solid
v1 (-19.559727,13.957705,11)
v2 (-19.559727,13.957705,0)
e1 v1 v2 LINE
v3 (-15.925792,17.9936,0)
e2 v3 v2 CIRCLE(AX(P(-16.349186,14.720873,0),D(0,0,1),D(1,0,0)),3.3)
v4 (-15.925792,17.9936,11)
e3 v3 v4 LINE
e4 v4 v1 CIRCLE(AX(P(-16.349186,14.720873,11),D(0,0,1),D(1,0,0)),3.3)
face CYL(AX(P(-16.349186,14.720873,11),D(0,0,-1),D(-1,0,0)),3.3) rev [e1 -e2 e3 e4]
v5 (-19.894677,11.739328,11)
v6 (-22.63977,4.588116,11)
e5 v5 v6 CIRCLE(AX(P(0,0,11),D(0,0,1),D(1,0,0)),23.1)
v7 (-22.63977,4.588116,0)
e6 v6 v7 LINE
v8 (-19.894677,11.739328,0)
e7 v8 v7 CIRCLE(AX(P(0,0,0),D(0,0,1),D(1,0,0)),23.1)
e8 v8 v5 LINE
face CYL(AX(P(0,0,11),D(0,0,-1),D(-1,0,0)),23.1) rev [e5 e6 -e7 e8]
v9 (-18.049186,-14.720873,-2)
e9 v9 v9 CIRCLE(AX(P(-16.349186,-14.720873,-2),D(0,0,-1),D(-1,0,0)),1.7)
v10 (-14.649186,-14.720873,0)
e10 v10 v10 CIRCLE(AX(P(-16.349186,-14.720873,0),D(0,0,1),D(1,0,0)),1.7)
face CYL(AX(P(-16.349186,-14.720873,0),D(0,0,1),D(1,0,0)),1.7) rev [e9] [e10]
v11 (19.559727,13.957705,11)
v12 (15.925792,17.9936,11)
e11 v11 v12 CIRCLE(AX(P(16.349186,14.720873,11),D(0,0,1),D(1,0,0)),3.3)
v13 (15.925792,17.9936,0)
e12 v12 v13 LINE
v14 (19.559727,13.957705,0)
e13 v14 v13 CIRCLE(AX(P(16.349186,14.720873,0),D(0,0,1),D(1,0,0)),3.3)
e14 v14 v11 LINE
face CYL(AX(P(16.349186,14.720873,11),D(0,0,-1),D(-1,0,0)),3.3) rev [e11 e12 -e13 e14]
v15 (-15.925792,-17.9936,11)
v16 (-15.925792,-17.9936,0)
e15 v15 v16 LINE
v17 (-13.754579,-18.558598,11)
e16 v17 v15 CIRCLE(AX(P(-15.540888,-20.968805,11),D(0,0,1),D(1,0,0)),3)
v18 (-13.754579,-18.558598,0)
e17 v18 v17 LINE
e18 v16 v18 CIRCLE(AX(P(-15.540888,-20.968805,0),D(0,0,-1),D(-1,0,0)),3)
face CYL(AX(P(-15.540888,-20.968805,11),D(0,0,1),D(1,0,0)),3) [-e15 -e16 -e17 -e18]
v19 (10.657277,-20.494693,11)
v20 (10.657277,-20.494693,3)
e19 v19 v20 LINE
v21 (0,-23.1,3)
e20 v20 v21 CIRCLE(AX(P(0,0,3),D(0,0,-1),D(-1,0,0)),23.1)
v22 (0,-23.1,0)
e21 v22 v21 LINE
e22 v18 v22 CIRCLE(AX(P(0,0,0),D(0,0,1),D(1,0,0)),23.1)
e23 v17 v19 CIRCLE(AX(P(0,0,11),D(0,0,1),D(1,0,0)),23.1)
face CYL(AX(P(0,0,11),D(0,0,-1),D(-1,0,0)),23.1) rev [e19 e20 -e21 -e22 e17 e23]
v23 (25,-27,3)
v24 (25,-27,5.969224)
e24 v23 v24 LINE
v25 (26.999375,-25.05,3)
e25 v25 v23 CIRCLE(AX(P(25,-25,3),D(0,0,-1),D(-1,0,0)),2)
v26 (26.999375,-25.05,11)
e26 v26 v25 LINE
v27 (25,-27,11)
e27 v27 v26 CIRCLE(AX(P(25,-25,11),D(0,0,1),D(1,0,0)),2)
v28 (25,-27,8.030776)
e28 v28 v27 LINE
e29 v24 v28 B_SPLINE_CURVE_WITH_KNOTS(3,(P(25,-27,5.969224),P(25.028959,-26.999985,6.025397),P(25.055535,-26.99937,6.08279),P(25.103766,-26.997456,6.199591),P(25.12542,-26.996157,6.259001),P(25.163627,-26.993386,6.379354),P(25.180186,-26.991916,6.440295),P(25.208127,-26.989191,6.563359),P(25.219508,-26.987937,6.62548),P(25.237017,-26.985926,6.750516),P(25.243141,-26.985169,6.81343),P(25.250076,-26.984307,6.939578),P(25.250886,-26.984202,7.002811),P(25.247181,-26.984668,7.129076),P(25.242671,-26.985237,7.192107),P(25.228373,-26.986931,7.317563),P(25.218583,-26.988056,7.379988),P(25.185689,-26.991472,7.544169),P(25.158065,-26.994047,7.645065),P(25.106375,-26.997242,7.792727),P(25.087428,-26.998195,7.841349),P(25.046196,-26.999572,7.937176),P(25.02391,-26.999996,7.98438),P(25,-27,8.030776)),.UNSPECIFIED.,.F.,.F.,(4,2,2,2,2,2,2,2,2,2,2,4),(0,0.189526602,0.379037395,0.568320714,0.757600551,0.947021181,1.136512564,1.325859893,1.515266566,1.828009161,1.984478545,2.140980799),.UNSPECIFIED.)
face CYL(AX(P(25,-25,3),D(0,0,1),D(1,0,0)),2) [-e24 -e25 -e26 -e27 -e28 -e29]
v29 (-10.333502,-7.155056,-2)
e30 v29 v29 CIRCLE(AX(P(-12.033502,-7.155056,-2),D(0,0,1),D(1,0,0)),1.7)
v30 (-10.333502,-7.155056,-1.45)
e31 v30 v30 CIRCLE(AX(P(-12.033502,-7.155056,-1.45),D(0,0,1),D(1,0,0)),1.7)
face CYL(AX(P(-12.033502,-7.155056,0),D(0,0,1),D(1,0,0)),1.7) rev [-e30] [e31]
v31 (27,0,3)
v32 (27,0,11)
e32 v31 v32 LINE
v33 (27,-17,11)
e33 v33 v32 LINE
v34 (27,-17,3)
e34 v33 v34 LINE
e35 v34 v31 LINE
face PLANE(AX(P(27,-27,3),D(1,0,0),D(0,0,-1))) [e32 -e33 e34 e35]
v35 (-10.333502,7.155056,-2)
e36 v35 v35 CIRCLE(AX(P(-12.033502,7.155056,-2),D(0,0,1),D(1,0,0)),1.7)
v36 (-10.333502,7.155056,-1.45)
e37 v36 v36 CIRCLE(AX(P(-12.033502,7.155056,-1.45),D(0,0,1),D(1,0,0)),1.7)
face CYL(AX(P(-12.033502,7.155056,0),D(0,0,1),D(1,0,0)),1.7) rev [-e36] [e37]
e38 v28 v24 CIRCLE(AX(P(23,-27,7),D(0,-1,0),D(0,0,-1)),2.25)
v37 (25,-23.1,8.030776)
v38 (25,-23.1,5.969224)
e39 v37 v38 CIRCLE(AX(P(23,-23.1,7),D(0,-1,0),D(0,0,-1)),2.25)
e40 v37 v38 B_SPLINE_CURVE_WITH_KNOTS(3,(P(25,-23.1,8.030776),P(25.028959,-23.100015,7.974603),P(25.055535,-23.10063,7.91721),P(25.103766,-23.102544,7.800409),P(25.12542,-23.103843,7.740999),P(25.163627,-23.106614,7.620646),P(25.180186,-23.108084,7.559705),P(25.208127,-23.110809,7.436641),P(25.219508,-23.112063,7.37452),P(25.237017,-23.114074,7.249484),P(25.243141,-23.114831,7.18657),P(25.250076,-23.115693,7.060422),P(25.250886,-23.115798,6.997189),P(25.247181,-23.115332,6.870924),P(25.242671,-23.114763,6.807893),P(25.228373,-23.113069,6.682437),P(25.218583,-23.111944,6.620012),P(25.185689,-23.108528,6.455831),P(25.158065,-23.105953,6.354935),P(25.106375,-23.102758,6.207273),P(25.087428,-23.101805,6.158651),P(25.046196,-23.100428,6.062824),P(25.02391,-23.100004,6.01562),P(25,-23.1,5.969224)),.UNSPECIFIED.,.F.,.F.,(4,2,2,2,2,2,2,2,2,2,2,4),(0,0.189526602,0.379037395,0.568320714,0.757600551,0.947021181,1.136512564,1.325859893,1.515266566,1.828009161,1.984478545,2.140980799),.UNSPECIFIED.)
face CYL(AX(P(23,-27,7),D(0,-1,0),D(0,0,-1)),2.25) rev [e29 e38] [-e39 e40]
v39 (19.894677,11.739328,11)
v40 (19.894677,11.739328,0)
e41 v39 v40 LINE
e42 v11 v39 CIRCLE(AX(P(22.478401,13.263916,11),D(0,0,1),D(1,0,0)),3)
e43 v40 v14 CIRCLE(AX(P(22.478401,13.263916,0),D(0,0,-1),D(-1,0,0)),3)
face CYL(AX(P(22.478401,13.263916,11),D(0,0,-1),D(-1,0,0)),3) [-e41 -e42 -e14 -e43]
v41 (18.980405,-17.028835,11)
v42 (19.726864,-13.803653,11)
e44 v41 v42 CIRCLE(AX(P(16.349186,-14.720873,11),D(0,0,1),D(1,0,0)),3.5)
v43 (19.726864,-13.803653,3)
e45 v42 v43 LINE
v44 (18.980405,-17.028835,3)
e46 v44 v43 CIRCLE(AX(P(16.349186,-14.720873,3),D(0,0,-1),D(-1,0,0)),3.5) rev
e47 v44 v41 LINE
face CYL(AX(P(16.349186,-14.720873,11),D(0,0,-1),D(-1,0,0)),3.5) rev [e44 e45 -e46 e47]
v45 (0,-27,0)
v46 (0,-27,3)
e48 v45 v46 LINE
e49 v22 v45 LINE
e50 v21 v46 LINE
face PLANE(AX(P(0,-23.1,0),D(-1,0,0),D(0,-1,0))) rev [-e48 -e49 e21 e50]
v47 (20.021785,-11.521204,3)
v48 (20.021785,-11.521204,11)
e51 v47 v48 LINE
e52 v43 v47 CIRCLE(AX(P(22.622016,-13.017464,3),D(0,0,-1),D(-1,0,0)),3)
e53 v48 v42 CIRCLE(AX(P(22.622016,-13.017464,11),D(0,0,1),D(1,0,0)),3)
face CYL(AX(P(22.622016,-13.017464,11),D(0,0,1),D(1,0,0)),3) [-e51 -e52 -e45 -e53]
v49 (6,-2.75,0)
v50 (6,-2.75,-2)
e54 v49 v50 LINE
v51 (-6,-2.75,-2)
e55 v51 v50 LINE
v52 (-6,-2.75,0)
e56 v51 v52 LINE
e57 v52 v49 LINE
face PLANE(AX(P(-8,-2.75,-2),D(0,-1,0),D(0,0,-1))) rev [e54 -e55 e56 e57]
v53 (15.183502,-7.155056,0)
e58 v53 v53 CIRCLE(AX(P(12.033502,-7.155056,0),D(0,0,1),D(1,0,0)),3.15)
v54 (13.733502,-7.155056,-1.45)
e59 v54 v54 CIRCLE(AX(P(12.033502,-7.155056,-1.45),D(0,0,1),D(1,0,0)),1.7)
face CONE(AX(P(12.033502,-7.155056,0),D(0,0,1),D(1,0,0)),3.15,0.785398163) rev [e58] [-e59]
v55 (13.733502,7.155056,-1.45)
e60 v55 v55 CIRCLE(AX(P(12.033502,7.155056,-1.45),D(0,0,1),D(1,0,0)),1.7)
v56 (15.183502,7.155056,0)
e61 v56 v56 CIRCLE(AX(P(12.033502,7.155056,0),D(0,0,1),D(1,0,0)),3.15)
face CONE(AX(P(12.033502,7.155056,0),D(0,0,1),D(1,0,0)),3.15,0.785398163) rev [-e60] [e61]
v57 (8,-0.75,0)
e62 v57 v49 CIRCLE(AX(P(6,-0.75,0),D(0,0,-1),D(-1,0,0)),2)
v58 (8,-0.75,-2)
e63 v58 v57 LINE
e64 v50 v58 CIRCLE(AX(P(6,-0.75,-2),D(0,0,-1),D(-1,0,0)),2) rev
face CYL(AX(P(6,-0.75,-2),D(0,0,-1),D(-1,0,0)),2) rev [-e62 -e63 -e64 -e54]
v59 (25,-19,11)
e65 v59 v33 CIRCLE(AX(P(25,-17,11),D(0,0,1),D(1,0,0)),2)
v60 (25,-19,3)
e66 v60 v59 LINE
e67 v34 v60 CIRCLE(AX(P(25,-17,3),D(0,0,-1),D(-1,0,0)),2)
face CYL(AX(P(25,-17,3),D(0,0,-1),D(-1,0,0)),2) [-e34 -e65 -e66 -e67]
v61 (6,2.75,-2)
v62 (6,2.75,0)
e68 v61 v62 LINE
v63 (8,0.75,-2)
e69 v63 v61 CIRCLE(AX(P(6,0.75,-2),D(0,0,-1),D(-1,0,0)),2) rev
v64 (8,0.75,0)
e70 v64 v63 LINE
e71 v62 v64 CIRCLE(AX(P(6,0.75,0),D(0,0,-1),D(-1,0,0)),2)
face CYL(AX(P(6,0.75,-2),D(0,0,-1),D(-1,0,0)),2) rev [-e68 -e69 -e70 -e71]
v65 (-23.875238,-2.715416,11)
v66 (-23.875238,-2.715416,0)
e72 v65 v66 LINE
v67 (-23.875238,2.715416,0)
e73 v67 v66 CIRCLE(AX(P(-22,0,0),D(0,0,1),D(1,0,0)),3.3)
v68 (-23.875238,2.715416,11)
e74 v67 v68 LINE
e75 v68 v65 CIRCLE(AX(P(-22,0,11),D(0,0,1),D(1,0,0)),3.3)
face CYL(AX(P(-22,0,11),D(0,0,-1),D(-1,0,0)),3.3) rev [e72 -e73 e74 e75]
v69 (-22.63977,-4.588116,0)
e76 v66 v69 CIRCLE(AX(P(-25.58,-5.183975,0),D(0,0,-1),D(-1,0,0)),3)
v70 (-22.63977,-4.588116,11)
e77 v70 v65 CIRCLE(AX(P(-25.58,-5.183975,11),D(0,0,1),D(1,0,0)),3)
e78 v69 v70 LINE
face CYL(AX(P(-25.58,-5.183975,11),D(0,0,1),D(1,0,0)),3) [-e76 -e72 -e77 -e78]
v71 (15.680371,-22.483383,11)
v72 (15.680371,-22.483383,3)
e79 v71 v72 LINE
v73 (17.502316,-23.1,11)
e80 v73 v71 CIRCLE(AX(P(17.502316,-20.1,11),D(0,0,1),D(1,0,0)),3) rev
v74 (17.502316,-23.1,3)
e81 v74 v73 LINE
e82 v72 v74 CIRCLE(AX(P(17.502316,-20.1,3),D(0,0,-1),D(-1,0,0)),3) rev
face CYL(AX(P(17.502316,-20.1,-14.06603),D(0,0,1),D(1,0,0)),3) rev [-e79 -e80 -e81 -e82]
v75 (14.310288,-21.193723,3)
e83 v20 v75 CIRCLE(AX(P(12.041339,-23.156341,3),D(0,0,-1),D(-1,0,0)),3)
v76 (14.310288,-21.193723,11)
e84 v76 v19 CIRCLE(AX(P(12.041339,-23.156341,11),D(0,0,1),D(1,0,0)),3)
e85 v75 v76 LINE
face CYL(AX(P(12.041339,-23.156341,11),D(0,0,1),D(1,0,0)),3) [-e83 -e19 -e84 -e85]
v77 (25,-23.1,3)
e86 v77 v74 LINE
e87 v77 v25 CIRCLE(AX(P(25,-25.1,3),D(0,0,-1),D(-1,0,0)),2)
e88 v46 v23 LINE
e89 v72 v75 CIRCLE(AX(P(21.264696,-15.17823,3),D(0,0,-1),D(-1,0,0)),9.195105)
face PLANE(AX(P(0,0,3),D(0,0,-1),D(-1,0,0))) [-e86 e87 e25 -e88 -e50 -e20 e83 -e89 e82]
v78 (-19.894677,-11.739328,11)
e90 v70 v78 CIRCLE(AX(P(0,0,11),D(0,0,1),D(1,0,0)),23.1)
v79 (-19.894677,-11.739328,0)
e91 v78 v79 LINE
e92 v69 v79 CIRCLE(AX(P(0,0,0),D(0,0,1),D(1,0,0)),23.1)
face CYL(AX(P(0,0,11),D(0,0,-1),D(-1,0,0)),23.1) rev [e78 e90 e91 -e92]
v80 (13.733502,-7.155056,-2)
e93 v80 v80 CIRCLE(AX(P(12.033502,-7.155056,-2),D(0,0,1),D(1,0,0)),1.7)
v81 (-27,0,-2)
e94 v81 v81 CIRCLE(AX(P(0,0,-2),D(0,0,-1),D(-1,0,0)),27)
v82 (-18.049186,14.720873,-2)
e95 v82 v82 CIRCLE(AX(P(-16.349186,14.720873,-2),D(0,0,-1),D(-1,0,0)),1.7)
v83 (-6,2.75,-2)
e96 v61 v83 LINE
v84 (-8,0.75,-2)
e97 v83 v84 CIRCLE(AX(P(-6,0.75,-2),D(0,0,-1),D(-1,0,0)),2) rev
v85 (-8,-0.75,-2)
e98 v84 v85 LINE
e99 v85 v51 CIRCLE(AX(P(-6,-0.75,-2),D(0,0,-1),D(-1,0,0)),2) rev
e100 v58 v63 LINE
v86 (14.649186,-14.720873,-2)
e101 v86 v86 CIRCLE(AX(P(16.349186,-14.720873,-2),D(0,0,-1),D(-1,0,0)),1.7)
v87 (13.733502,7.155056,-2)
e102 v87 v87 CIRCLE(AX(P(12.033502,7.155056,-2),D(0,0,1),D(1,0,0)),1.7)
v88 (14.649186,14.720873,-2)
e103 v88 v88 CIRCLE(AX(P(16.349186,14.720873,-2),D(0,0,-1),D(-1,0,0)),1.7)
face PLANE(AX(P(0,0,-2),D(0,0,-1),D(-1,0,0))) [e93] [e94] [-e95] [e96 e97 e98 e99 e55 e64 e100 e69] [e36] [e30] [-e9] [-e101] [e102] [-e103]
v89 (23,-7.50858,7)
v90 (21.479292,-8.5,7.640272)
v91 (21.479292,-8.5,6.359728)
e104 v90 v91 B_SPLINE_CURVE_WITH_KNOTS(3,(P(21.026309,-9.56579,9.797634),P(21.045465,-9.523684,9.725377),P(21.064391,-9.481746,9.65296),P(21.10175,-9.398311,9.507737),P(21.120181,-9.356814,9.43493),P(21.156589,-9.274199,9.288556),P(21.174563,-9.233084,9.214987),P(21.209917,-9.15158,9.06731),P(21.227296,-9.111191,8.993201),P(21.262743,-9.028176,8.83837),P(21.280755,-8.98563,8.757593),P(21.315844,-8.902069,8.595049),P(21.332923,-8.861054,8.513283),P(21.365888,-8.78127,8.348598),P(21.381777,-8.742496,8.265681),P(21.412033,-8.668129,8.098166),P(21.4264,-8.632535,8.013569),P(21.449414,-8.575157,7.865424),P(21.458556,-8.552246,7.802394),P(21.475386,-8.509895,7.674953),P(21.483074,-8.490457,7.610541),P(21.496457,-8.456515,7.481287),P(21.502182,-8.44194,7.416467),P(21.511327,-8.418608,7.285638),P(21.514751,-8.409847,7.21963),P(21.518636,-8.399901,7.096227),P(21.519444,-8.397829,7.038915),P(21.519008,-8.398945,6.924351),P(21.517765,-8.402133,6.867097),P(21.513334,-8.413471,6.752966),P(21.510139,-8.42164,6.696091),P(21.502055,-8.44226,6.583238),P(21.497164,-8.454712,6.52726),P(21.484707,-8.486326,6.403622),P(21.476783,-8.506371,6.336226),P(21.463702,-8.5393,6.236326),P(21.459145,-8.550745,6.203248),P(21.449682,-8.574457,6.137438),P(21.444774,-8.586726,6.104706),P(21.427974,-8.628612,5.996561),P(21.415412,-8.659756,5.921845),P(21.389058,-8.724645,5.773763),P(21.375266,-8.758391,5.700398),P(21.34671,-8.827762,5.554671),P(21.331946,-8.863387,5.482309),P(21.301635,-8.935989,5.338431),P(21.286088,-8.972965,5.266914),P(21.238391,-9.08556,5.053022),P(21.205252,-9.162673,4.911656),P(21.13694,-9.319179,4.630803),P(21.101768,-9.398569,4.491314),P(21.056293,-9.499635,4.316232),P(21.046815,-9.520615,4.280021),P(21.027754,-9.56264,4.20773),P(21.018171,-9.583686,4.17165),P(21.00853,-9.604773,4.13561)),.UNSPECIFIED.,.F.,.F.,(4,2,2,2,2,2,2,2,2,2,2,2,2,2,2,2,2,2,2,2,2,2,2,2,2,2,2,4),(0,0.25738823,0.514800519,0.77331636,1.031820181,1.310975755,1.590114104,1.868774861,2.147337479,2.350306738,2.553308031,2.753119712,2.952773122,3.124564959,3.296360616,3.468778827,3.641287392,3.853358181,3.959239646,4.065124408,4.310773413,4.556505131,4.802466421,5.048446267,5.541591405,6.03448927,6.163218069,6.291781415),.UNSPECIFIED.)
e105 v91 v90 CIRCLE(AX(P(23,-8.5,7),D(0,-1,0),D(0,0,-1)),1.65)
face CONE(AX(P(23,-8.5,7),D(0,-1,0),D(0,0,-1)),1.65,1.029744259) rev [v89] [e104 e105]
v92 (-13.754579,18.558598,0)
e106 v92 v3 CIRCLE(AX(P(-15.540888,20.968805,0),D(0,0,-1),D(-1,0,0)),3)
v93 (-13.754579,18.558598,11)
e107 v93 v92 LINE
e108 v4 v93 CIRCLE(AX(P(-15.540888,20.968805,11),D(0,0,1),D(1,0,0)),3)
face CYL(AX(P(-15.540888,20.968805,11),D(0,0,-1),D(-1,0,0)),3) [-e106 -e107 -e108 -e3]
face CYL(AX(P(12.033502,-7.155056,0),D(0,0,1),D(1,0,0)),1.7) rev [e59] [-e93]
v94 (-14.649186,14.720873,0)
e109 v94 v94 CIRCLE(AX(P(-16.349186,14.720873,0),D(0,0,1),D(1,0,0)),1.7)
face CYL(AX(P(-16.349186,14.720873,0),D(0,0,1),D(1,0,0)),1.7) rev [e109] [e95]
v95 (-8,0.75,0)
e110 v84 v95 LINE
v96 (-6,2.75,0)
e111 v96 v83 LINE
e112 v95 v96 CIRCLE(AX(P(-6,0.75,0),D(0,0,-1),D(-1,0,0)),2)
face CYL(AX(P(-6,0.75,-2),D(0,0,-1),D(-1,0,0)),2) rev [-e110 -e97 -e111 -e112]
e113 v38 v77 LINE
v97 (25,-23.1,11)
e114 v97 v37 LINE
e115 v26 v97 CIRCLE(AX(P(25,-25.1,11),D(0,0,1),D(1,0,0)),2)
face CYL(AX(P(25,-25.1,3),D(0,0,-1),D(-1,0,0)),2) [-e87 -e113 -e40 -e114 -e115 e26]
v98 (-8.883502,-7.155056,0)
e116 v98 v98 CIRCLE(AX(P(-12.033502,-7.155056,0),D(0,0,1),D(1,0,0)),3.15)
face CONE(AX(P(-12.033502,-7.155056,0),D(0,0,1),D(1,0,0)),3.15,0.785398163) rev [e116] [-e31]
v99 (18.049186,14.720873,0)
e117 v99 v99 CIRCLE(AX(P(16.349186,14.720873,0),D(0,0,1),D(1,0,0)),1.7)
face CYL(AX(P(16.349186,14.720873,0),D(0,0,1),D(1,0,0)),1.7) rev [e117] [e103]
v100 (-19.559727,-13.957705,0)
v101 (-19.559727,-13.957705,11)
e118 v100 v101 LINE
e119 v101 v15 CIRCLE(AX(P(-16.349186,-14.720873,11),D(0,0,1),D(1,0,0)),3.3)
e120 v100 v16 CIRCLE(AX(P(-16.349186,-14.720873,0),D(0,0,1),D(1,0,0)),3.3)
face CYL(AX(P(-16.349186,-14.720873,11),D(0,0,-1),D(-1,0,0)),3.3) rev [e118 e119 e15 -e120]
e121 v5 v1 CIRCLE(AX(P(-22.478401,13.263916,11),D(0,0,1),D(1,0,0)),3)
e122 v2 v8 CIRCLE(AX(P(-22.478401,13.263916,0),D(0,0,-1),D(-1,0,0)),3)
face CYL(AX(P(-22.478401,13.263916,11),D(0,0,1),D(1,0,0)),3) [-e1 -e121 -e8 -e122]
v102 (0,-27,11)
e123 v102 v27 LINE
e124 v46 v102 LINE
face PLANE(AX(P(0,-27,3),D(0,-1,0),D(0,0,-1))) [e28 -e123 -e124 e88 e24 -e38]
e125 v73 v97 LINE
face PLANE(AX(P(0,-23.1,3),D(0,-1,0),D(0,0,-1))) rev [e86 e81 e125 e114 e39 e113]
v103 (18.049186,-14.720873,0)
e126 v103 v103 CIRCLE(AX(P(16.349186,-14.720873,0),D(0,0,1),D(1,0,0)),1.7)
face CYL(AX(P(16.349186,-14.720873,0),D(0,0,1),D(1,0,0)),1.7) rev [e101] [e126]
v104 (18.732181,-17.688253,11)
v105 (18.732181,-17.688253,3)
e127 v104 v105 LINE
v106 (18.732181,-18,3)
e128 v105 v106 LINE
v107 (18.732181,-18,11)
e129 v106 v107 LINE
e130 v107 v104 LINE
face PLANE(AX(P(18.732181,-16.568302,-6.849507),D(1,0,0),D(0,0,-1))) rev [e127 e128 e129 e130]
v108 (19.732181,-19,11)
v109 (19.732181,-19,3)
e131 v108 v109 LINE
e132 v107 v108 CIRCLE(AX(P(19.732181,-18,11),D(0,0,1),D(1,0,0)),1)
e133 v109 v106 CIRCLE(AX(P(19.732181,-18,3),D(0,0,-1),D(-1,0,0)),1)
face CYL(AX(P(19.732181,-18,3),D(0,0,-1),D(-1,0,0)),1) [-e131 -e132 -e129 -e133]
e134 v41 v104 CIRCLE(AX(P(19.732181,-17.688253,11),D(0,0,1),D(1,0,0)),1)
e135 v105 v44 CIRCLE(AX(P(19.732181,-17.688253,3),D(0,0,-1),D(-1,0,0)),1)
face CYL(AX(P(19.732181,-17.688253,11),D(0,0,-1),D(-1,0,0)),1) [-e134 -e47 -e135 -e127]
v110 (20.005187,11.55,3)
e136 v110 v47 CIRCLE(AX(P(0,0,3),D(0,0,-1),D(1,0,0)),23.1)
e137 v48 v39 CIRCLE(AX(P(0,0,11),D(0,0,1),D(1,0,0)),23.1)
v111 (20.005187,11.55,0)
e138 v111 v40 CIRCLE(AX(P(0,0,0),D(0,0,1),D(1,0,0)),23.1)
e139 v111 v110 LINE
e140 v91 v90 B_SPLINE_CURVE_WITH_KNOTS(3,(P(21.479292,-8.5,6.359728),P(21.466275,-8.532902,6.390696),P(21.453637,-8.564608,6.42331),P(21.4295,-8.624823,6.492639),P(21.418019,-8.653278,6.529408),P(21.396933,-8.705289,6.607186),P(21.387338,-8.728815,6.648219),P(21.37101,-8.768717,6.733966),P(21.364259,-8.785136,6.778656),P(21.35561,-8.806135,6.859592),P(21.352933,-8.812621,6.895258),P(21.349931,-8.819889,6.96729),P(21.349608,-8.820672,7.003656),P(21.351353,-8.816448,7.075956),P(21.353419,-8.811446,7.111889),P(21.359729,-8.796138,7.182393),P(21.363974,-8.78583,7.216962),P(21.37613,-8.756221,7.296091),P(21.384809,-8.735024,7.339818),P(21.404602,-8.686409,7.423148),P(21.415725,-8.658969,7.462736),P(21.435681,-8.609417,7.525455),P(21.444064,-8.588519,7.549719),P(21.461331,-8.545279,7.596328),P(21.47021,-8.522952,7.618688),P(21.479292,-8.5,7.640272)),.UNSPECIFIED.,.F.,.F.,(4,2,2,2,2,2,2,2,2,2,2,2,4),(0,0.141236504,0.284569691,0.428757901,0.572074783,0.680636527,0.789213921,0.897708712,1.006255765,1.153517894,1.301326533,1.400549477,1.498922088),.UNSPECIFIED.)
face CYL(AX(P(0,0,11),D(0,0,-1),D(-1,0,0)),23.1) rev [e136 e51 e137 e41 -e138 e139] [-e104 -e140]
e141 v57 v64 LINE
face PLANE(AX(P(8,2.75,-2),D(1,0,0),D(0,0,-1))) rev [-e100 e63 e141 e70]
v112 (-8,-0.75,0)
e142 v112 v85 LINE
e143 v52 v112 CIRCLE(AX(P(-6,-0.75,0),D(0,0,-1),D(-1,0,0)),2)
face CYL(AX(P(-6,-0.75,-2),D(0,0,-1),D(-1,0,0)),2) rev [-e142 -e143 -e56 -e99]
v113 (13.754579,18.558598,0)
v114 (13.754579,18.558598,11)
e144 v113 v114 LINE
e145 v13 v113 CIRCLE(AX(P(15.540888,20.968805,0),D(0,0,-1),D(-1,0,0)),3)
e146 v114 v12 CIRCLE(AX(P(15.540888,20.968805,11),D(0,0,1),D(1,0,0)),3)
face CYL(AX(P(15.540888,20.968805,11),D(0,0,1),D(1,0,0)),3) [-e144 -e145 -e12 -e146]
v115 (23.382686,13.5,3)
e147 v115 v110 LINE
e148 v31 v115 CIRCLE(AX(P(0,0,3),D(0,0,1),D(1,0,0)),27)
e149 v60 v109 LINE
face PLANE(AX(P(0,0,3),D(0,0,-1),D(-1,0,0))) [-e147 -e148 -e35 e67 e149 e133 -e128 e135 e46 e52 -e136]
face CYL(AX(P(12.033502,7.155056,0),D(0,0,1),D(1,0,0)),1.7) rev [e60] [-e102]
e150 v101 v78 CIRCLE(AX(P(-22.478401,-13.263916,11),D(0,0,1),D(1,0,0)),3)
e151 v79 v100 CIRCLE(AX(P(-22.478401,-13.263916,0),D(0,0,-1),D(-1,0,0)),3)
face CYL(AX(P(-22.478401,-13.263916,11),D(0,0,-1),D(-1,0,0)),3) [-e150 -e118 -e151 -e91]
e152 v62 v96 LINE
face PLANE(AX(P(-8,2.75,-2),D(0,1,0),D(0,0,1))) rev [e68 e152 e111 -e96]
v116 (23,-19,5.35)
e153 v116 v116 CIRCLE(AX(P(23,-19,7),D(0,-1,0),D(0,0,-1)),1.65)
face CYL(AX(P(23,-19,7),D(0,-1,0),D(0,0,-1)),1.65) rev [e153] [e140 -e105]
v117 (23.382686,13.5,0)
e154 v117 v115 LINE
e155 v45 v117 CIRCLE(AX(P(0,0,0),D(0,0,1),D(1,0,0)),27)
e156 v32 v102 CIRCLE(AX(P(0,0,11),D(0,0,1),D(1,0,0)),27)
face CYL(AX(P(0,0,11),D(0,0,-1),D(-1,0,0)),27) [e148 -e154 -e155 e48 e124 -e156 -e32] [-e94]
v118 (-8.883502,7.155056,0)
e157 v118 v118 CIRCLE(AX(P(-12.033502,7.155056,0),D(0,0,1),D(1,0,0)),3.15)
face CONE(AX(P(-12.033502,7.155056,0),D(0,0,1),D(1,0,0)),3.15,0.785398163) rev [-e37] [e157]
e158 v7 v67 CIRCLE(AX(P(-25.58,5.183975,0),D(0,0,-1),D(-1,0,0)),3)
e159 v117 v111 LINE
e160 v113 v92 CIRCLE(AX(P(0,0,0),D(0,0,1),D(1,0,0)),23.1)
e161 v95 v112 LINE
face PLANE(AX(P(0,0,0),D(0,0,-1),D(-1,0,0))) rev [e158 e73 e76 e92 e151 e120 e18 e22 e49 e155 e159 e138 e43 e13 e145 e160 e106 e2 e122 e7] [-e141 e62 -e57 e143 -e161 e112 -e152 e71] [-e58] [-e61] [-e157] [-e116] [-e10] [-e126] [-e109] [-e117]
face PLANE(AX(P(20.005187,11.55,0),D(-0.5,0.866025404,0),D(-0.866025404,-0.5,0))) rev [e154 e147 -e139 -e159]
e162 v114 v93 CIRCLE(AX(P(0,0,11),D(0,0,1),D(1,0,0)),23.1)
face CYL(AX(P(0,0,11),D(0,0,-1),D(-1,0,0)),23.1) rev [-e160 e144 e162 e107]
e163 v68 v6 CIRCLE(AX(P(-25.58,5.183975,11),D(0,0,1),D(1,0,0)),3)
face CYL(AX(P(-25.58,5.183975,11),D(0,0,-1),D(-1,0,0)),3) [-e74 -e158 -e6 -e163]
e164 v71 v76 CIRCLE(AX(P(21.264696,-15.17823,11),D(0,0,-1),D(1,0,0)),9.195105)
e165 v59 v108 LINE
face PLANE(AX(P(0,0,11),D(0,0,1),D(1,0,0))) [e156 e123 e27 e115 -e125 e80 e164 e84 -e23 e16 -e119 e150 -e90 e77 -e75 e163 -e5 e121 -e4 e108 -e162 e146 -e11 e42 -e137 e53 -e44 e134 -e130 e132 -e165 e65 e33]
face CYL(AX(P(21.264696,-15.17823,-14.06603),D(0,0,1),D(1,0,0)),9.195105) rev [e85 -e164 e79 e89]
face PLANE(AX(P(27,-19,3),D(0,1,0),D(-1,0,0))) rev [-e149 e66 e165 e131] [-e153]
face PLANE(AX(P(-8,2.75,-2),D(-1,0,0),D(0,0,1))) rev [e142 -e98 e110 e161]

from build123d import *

# Parameters (mm, degrees)
SKETCH_1_R                   = 27
SKETCH_1_R_2                 = 23.1
EXTRUDE_1_DEPTH              = 11
EXTRUDE_START                = 2
SKETCH_2_R                   = 27
EXTRUDE_2_DEPTH              = 2
EXTRUDE_START_2              = -8
EXTRUDE_3_DEPTH              = 8
CUT_EXTRUDE_START            = -8
CUT_EXTRUDE_1_DEPTH          = 8
HOLE_WIZARD_M41_D            = 4.5
HOLE_WIZARD_M41_DEPTH        = 3.9
M4X0_71_D                    = 3.3
M4X0_71_DEPTH                = 10.5
M4X0_71_TIP                  = 0.991420021
CUT_EXTRUDE_START_2          = -3
CUT_EXTRUDE_2_DEPTH          = 3
FILLET_1_R                   = 2
SKETCH_11_W                  = 16
SKETCH_11_H                  = 5.5
CUT_EXTRUDE_3_DEPTH          = 40.736633068
SKETCH_15_R                  = 3.3
SKETCH_15_R_2                = 3.5
CUT_EXTRUDE_5_DEPTH          = 40.736633068
FILLET_3_R                   = 3
SKETCH_16_W                  = 6.088373552
SKETCH_16_H                  = 3.13806494
CUT_EXTRUDE_6_DEPTH          = 11
HOLE_WIZARD_M31_D            = 3.4
HOLE_WIZARD_M31_DEPTH        = 18
HOLE_WIZARD_M31_TIP          = 1.021463052
HOLE_WIZARD_M31_2_AT_2_COUNT = 2
HOLE_WIZARD_M31_2_AT_2_PITCH = 14.310111001
HOLE_WIZARD_M31_2_AT_3_COUNT = 2
HOLE_WIZARD_M31_2_AT_3_PITCH = 28
HOLE_WIZARD_M31_2_AT_4_COUNT = 2
HOLE_WIZARD_M31_2_AT_4_PITCH = 24.067004865
FILLET_7_R                   = 2
EXTRUDE_4_DEPTH              = 8
FILLET_8_R                   = 3
FILLET_9_R                   = 1


with BuildPart() as part:
    # Эскиз1 → Бобышка-Вытянуть1 (new body)
    with BuildSketch(Plane.XY):
        Circle(SKETCH_1_R)
        Circle(SKETCH_1_R_2, mode=Mode.SUBTRACT)
    extrude(amount=EXTRUDE_1_DEPTH)

    # Эскиз2 → Бобышка-Вытянуть2 (add)
    with BuildSketch(Plane(origin=(0, 0, 0), x_dir=(-1, 0, 0), z_dir=(0, 0, -1)).offset(EXTRUDE_START)):
        Circle(SKETCH_2_R)
    extrude(amount=-EXTRUDE_2_DEPTH)

    # Эскиз3 → Бобышка-Вытянуть3 (add)
    with BuildSketch(Plane.XY.offset(11).offset(EXTRUDE_START_2)):
        with BuildLine():
            Line((0, -27), (27, -27))
            Line((27, -27), (27, 0))
            ThreePointArc((27, 0), (19.091883092, -19.091883092), (0, -27))
        make_face()
    extrude(amount=EXTRUDE_3_DEPTH)

    # Эскиз4 → Вырез-Вытянуть1 (cut)
    with BuildSketch(Plane.XY.offset(11).offset(CUT_EXTRUDE_START)):
        with BuildLine():
            Line((0, -23.1), (27, -23.1))
            Line((27, -23.1), (27, -19))
            Line((27, -19), (13.138112498, -19))
            ThreePointArc((13.138112498, -19), (6.88149693, -22.051190444), (0, -23.1))
        make_face()
    extrude(amount=CUT_EXTRUDE_1_DEPTH, mode=Mode.SUBTRACT)

    # Отверстие с зазором M41
    with Locations(Plane(origin=(0, -27, 0), x_dir=(-1, 0, 0), z_dir=(0, -1, 0))):
        with Locations((-23, -7)):
            Hole(HOLE_WIZARD_M41_D / 2, depth=HOLE_WIZARD_M41_DEPTH)

    # Отверстие обработанное метчиком M4x0.71
    with Locations(Plane(origin=(0, -19, 0), x_dir=(-1, 0, 0), z_dir=(0, -1, 0))):
        with Locations((-23, -7)):
            Hole(M4X0_71_D / 2, depth=M4X0_71_DEPTH)
            with Locations((0, 0, -(M4X0_71_DEPTH + M4X0_71_TIP / 2))):  # 118° drill point
                Cone(0, M4X0_71_D / 2, M4X0_71_TIP, mode=Mode.SUBTRACT)

    # Эскиз10 → Вырез-Вытянуть2 (cut)
    with BuildSketch(Plane.XY.offset(3).offset(CUT_EXTRUDE_START_2)):
        with BuildLine():
            Line((20.005186827, 11.55), (23.382685902, 13.5))
            ThreePointArc((23.382685902, 13.5), (23.382685902, -13.5), (0, -27))
            Line((0, -27), (0, -23.1))
            ThreePointArc((0, -23.1), (20.005186827, -11.55), (20.005186827, 11.55))
        make_face()
    extrude(amount=CUT_EXTRUDE_2_DEPTH, mode=Mode.SUBTRACT)

    # Скругление1
    # the kernel refuses this fillet: 2 mm, written as the material it takes off along each edge
    with BuildSketch(Plane(origin=(27, -27, -2), x_dir=(-1, 0, 0), z_dir=(0, 0, 1)), Plane(origin=(27, -19, -2), x_dir=(-1, 0, 0), z_dir=(0, 0, 1))) as fillet_1_piece_1:
        with BuildLine():
            CenterArc((FILLET_1_R, -FILLET_1_R), FILLET_1_R, 90, 90)
            Line((0, -FILLET_1_R), (0, 0))
            Line((0, 0), (FILLET_1_R, 0))
        make_face()
    extrude(amount=18, mode=Mode.SUBTRACT)
    with BuildSketch(Plane(origin=(27, -23.1, -2), x_dir=(-1, 0, 0), z_dir=(0, 0, 1))) as fillet_1_piece_2:
        with BuildLine():
            CenterArc((FILLET_1_R, FILLET_1_R), FILLET_1_R, 180, 90)
            Line((0, FILLET_1_R), (0, 0))
            Line((0, 0), (FILLET_1_R, 0))
        make_face()
    extrude(amount=18, mode=Mode.SUBTRACT)

    # Эскиз11 → Вырез-Вытянуть3 (cut, through all)
    with BuildSketch(Plane.XY):
        Rectangle(SKETCH_11_W, SKETCH_11_H)
    extrude(amount=-CUT_EXTRUDE_3_DEPTH, mode=Mode.SUBTRACT)

    # Эскиз15 → Вырез-Вытянуть5 (cut, through all)
    with BuildSketch(Plane.XY):
        with Locations((-16.349186161, 14.72087334)):
            Circle(SKETCH_15_R)
        with Locations((16.349186161, 14.72087334)):
            Circle(SKETCH_15_R)
        with Locations((16.349186161, -14.72087334)):
            Circle(SKETCH_15_R_2)
        with Locations((-16.349186161, -14.72087334)):
            Circle(SKETCH_15_R)
        with Locations((-22, 0)):
            Circle(SKETCH_15_R)
    extrude(amount=CUT_EXTRUDE_5_DEPTH, mode=Mode.SUBTRACT)

    # Скругление3
    fillet_3_edges = [part.edges().sort_by_distance(p)[0] for p in [
        (-14.874981636, 17.673282698, 5.5),
        (-19.131325578, 12.946133849, 5.5),
        (19.131325578, 12.946133849, 5.5),
        (14.874981636, 17.673282698, 5.5),
        (19.252179639, -12.765718905, 7),
        (-19.131325578, -12.946133849, 5.5),
        (-14.874981636, -17.673282698, 5.5),
        (-22.88, 3.180503105, 5.5),
        (-22.88, -3.180503105, 5.5),
    ]]
    fillet(fillet_3_edges, radius=FILLET_3_R)

    # Эскиз16 → Вырез-Вытянуть6 (cut)
    with BuildSketch(Plane.XY.offset(11)):
        with Locations((15.687994571, -18.137334547)):
            Rectangle(SKETCH_16_W, SKETCH_16_H)
    extrude(amount=-CUT_EXTRUDE_6_DEPTH, mode=Mode.SUBTRACT)

    # Hole Wizard M31
    with Locations(Plane.XY):
        with Locations((-16.349186161, 14.72087334), (16.349186161, 14.72087334), (16.349186161, -14.72087334), (-16.349186161, -14.72087334)):
            Hole(HOLE_WIZARD_M31_D / 2, depth=HOLE_WIZARD_M31_DEPTH)
            with Locations((0, 0, -(HOLE_WIZARD_M31_DEPTH + HOLE_WIZARD_M31_TIP / 2))):  # 118° drill point
                Cone(0, HOLE_WIZARD_M31_D / 2, HOLE_WIZARD_M31_TIP, mode=Mode.SUBTRACT)

    # Эскиз19 → Hole Wizard M31 2 (revolve, cut)
    with BuildSketch(Plane(origin=(-12.033502432, 7.1550555, 0), x_dir=(0, -1, 0), z_dir=(1, 0, 0))):
        Polygon((0, 0), (0, 2), (1.7, 2), (1.7, 1.45), (3.15, 0), align=None)
    hole_wizard_m31_2 = revolve(axis=Axis((-12.033502432, 7.1550555, 6.35), (0, 0, -1)), mode=Mode.SUBTRACT)

    # Hole Wizard M31 2 at 2: Hole Wizard M31 2 ×2
    with Locations(*[(0, -i * HOLE_WIZARD_M31_2_AT_2_PITCH, 0) for i in range(1, HOLE_WIZARD_M31_2_AT_2_COUNT)]):
        add(hole_wizard_m31_2, mode=Mode.SUBTRACT)

    # Hole Wizard M31 2 at 3: Hole Wizard M31 2 ×2
    with Locations(*[Vector(0.859535888020661, -0.5110753928771503, 0) * (i * HOLE_WIZARD_M31_2_AT_3_PITCH) for i in range(1, HOLE_WIZARD_M31_2_AT_3_COUNT)]):
        add(hole_wizard_m31_2, mode=Mode.SUBTRACT)

    # Hole Wizard M31 2 at 4: Hole Wizard M31 2 ×2
    with Locations(*[(i * HOLE_WIZARD_M31_2_AT_4_PITCH, 0, 0) for i in range(1, HOLE_WIZARD_M31_2_AT_4_COUNT)]):
        add(hole_wizard_m31_2, mode=Mode.SUBTRACT)

    # Скругление7
    fillet_7_edges = [part.edges().sort_by_distance(p)[0] for p in [
        (8, 2.75, -1),
        (8, -2.75, -1),
        (-8, -2.75, -1),
        (-8, 2.75, -1),
    ]]
    fillet(fillet_7_edges, radius=FILLET_7_R)

    # Эскиз21 → Бобышка-Вытянуть4 (add)
    with BuildSketch(Plane.XY.offset(11).offset(EXTRUDE_START_2)):
        with BuildLine():
            Line((16.596130054, -23.1), (0, -23.1))
            ThreePointArc((0, -23.1), (6.777628995, -22.083336369), (12.958671938, -19.122835083))
            ThreePointArc((12.958671938, -19.122835083), (14.479457868, -21.383912063), (16.596130054, -23.1))
        make_face()
    extrude(amount=EXTRUDE_4_DEPTH)

    # Скругление8
    fillet_8_edges = [part.edges().sort_by_distance(p)[0] for p in [
        (16.596130054, -23.1, 7),
        (12.958671938, -19.122835083, 7),
    ]]
    fillet(fillet_8_edges, radius=FILLET_8_R)

    # Скругление9
    fillet_9_edges = [part.edges().sort_by_distance(p)[0] for p in [
        (18.732181347, -17.28433466, 7),
        (18.732181347, -19, 7),
    ]]
    fillet(fillet_9_edges, radius=FILLET_9_R)


solid = part.part
